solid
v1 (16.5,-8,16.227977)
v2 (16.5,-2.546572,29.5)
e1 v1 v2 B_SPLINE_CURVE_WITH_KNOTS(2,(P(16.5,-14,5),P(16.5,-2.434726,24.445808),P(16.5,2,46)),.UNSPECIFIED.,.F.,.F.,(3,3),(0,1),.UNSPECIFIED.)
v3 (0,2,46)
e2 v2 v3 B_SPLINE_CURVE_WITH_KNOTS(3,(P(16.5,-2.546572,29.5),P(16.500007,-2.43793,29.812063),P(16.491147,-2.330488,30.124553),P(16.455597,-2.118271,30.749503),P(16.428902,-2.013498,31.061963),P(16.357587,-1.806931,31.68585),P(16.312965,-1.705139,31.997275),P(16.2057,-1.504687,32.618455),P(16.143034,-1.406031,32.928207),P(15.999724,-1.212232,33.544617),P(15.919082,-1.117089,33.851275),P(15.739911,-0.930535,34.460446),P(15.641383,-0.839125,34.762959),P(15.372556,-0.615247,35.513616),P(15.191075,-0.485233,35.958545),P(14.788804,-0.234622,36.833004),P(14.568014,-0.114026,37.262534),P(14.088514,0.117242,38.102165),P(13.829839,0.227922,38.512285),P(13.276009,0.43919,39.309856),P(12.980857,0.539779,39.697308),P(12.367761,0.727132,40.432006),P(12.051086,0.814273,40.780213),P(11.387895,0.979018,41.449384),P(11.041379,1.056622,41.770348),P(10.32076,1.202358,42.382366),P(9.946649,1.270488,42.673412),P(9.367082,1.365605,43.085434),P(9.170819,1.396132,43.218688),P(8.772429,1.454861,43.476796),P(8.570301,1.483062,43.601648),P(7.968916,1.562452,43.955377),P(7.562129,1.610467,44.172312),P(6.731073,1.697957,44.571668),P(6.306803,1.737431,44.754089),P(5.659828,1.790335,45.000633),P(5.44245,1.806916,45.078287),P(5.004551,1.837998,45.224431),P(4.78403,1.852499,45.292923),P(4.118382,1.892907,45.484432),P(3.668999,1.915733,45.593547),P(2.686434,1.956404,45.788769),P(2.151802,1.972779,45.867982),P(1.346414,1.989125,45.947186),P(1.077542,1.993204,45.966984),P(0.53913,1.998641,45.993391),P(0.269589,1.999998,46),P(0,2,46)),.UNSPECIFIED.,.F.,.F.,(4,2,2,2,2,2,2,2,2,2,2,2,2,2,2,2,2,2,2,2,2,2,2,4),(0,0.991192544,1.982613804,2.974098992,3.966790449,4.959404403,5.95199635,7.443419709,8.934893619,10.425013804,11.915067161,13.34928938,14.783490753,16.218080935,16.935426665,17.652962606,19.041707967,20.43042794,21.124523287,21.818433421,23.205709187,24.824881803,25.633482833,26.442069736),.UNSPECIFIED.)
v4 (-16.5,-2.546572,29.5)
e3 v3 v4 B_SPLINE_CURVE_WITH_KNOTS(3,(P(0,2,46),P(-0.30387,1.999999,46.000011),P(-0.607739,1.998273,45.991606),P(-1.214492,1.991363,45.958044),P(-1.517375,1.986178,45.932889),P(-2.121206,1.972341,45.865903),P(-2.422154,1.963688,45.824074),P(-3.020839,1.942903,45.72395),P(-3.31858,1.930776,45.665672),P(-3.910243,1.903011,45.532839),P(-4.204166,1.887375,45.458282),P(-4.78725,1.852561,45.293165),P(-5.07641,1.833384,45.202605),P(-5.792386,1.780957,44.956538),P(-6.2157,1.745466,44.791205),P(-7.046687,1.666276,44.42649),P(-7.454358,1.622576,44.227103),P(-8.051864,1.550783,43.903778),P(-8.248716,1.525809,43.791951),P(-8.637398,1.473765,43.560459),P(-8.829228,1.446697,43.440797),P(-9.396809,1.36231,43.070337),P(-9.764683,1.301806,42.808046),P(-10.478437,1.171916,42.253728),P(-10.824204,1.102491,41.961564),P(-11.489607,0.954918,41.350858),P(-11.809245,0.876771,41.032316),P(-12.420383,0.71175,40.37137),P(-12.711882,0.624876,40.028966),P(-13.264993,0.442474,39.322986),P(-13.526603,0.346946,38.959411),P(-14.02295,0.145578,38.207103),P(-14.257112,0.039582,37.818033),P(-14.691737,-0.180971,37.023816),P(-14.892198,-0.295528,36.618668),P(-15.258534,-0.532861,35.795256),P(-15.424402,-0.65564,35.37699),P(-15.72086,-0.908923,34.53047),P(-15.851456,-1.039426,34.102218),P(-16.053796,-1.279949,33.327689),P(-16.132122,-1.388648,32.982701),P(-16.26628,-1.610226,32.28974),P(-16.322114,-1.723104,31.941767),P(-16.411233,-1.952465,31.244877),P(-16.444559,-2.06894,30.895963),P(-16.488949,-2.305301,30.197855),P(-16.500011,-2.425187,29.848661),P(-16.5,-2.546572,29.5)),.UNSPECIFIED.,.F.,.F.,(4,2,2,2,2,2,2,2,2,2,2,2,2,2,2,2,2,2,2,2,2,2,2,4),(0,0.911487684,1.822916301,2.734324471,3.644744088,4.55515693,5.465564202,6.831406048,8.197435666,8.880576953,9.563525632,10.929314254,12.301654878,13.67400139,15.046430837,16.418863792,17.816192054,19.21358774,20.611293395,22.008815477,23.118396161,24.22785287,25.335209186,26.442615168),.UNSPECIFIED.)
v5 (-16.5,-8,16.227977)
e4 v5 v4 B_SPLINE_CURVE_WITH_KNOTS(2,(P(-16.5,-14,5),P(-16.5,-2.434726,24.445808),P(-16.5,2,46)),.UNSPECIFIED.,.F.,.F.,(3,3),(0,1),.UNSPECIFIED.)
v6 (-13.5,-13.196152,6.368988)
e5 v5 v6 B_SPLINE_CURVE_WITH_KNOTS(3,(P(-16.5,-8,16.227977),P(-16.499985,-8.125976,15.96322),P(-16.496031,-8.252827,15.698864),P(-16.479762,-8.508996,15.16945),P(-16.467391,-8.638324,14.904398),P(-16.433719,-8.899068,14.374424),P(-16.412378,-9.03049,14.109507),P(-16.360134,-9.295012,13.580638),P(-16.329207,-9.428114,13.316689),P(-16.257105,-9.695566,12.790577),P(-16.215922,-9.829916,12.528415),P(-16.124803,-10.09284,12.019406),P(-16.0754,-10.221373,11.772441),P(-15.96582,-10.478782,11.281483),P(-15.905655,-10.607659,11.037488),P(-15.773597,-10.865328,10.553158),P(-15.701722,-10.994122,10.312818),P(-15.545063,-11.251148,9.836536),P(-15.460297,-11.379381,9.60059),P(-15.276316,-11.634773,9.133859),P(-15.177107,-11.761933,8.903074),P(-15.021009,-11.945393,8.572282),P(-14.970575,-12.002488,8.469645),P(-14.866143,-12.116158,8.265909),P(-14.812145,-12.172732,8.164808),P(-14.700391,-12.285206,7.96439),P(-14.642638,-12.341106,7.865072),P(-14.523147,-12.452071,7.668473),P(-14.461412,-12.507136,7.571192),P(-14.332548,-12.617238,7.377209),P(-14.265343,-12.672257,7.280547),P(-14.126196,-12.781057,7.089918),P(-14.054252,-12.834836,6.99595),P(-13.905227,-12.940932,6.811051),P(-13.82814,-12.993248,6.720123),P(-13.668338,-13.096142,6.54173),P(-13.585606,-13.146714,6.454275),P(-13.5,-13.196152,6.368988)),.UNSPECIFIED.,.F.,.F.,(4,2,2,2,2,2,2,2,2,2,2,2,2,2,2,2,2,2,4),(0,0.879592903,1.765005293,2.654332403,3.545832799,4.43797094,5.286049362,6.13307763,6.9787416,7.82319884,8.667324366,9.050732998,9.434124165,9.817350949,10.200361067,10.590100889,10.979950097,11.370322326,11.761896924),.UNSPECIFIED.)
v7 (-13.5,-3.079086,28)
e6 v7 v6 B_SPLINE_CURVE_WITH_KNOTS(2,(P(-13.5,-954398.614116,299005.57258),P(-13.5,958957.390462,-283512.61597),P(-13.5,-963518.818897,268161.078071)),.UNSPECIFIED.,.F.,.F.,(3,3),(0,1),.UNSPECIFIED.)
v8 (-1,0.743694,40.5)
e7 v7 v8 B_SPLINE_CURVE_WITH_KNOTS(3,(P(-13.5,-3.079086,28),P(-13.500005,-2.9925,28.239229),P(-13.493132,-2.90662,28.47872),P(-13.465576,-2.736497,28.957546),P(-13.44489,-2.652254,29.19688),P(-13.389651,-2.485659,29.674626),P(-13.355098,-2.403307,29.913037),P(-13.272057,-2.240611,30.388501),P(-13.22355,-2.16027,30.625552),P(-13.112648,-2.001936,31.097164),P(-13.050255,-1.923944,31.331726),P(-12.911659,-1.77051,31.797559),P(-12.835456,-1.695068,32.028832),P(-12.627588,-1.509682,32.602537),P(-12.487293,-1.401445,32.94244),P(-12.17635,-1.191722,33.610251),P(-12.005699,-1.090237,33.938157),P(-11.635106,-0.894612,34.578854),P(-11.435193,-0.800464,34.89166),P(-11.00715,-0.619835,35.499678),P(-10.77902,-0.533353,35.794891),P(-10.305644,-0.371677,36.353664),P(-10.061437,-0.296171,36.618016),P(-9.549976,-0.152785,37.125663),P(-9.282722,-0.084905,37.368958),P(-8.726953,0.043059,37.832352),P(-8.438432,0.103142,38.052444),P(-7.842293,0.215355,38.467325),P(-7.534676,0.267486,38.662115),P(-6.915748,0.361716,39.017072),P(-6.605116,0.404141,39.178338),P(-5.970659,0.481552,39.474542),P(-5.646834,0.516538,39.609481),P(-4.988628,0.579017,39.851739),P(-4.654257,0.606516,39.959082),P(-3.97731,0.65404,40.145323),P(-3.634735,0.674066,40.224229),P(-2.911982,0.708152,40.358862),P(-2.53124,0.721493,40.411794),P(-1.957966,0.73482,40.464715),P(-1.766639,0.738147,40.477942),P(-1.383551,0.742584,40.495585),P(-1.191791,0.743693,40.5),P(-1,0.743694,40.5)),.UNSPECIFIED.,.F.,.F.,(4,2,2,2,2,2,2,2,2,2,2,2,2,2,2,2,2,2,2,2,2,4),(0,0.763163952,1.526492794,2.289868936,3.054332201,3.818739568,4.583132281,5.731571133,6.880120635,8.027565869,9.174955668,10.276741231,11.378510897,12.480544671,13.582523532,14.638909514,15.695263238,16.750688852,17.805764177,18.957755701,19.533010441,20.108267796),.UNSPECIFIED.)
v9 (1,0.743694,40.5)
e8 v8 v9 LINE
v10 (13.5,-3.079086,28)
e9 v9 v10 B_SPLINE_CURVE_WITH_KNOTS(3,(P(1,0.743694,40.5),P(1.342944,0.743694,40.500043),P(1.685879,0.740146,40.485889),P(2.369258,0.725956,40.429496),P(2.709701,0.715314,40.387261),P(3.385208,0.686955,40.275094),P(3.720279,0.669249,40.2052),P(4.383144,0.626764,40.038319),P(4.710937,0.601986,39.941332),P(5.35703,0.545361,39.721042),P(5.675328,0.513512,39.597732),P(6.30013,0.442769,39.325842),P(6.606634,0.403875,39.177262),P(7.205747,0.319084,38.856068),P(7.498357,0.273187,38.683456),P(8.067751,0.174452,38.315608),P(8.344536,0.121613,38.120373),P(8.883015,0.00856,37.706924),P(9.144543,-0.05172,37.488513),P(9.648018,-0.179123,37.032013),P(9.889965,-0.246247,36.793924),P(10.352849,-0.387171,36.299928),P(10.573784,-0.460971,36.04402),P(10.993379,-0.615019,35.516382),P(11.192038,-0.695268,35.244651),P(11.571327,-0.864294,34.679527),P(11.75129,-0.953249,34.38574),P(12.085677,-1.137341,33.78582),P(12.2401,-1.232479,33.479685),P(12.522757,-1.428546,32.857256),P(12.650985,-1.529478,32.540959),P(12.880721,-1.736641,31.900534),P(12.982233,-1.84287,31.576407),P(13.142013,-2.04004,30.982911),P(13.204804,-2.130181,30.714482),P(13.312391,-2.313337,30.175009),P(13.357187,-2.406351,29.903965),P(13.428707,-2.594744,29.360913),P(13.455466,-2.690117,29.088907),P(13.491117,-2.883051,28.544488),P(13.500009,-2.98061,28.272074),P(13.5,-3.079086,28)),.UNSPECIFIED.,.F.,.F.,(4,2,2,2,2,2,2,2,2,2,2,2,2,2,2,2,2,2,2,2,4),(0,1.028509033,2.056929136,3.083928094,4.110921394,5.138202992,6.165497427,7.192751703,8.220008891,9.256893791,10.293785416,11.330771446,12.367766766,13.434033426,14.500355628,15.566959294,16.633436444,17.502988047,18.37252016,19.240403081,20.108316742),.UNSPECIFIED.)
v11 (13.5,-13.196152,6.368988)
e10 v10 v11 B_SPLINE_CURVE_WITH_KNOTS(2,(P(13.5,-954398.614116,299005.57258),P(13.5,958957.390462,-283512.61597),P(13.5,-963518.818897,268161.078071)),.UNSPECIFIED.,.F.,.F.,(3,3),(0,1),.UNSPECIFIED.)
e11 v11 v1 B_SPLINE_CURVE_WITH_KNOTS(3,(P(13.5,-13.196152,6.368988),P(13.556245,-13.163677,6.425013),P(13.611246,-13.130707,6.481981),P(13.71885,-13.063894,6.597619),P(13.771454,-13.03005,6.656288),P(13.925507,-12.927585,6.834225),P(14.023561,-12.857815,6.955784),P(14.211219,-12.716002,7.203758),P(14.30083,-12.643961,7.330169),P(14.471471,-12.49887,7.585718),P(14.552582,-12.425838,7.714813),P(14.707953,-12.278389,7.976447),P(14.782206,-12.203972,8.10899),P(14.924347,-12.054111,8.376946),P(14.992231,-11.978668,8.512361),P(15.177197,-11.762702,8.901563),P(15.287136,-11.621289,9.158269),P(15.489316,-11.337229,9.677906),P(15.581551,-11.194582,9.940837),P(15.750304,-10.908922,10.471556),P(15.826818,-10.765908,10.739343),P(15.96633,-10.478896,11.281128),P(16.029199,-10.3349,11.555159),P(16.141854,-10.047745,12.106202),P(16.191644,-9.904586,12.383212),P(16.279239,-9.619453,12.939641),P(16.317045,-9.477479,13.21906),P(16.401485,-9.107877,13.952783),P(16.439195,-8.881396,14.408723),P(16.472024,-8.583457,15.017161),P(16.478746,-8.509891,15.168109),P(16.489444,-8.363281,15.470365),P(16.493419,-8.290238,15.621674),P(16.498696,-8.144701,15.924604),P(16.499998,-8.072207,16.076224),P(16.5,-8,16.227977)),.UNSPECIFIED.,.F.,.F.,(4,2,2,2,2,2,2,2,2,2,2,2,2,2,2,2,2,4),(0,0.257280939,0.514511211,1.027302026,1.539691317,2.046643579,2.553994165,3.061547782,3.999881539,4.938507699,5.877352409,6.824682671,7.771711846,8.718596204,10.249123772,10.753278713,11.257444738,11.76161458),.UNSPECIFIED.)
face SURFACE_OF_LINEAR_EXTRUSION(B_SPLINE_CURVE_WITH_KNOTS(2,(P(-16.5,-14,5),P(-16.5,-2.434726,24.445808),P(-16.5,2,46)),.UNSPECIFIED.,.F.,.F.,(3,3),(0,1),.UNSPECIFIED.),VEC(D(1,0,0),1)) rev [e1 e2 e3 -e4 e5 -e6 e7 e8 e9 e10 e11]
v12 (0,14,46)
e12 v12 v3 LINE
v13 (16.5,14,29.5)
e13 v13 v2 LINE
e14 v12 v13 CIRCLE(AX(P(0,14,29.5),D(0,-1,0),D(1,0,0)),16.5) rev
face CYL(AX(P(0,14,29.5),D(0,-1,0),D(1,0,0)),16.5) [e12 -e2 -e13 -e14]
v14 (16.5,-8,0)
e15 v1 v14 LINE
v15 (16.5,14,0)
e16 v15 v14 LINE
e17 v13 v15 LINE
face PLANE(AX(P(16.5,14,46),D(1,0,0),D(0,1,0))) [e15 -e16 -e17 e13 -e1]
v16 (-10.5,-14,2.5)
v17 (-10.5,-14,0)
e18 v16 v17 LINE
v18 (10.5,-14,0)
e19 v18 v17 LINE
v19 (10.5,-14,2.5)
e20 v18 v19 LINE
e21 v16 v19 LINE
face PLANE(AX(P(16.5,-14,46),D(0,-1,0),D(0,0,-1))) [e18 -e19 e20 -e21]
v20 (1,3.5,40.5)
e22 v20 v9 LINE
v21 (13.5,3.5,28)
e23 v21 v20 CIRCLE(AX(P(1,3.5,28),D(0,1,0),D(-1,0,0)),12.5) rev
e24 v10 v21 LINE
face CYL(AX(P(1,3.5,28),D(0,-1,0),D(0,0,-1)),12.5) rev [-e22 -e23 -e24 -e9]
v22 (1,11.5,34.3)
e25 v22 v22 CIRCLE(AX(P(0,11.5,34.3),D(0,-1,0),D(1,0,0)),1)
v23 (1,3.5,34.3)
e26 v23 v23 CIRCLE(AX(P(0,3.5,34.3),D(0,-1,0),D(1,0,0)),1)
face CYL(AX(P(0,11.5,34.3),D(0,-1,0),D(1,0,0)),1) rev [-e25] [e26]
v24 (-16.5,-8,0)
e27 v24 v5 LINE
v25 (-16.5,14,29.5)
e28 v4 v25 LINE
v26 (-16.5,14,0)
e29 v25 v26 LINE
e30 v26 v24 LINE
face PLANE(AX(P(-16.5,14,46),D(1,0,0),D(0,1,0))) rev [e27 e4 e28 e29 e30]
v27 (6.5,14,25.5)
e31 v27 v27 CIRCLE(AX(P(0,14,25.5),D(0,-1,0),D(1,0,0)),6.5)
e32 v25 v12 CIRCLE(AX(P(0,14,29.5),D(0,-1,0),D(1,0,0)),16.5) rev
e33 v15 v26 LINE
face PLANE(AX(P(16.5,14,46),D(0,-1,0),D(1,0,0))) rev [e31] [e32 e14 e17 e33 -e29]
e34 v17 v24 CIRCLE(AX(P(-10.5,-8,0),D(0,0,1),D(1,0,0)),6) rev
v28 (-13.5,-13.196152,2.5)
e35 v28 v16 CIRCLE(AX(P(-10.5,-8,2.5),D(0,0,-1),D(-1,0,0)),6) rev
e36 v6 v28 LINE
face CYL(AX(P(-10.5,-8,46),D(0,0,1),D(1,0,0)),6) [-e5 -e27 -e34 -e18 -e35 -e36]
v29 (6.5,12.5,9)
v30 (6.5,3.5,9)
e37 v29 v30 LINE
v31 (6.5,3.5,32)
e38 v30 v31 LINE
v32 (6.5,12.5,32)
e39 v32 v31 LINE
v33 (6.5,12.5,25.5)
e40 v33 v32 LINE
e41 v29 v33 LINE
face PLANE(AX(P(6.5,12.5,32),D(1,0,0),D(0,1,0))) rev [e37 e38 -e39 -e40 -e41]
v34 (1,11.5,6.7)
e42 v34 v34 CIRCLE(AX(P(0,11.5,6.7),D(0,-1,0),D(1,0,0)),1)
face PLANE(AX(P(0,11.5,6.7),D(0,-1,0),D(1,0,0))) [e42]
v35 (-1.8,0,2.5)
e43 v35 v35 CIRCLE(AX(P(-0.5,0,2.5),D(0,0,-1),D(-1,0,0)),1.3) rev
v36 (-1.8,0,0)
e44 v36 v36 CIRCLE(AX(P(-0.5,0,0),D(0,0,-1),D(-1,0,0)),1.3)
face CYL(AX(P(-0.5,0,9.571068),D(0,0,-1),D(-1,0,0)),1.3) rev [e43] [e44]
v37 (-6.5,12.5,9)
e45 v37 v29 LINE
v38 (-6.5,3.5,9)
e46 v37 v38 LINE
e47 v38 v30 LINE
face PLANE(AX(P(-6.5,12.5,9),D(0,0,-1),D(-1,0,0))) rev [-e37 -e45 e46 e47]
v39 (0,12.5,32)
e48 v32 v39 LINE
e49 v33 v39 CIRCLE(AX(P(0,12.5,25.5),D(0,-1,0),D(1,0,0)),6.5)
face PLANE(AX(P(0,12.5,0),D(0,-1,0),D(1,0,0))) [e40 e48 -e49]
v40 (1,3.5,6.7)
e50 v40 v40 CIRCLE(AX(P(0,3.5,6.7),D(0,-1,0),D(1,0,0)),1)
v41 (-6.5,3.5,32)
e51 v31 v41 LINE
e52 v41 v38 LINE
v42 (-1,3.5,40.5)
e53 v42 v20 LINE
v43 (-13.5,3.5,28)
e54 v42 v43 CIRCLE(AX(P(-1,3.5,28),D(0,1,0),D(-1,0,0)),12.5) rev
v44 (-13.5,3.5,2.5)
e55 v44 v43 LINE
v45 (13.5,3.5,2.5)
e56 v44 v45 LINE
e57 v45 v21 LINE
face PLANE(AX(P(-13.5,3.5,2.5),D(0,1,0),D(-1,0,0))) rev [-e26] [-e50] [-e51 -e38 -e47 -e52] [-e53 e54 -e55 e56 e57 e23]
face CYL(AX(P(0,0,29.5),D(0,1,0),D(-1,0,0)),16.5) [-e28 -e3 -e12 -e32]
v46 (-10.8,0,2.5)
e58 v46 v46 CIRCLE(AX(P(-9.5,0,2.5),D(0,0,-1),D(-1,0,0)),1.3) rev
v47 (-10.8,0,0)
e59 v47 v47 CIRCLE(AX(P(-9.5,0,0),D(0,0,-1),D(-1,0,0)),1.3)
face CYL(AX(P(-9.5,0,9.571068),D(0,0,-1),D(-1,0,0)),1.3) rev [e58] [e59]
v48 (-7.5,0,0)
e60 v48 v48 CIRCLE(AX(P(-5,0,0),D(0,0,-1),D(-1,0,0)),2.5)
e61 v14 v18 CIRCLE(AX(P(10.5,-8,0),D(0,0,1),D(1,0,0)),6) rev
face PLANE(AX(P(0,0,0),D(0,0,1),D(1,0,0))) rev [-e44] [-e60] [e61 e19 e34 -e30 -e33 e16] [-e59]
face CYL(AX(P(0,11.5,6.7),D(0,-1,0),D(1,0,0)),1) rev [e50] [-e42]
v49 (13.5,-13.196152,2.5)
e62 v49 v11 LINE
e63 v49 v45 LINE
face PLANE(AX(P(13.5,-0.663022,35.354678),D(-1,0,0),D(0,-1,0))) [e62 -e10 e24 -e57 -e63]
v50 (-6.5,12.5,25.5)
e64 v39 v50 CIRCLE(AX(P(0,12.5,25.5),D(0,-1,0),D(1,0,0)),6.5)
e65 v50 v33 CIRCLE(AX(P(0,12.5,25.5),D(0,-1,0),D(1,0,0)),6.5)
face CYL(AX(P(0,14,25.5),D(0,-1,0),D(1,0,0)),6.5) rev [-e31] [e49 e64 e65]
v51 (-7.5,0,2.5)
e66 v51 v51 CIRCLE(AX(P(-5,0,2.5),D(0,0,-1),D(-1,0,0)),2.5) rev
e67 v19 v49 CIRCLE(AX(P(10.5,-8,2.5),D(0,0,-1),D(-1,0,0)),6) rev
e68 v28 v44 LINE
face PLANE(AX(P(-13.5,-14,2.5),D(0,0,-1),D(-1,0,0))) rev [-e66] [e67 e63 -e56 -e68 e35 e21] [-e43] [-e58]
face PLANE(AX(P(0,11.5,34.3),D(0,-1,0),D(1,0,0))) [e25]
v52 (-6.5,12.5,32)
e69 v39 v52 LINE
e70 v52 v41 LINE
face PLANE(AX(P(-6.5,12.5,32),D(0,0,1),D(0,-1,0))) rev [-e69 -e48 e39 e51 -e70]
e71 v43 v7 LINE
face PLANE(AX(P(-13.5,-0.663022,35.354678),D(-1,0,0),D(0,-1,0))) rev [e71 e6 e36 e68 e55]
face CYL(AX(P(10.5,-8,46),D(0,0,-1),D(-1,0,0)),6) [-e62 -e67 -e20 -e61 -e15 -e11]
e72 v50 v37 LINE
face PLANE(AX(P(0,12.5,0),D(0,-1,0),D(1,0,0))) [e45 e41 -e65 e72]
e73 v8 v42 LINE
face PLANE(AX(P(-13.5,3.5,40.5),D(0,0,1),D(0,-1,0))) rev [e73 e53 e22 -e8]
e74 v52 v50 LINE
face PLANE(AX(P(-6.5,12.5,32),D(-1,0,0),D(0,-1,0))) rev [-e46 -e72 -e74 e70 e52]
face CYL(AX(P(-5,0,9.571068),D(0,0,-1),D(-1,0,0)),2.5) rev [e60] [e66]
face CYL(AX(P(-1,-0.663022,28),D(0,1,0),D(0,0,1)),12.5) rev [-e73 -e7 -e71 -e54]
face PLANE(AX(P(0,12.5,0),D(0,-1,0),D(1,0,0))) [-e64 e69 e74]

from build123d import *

# Parameters (mm, degrees)
SKETCH1_W           = 33
SKETCH1_H           = 28
BOSS_EXTRUDE1_DEPTH = 46
CUT_EXTRUDE1_DEPTH  = 59.318093247
CUT_EXTRUDE2_START  = -3
CUT_EXTRUDE2_DEPTH  = 27
FILLET1_R           = 12.5
FILLET2_R           = 16.5
FILLET3_R           = 6
SKETCH4_W           = 13
SKETCH4_H           = 23
CUT_EXTRUDE3_DEPTH  = 9
SKETCH5_R           = 6.5
CUT_EXTRUDE4_DEPTH  = 56.592265809
SKETCH6_R           = 1
CUT_EXTRUDE5_DEPTH  = 8
SKETCH7_R           = 1.3
SKETCH7_R_2         = 2.5
CUT_EXTRUDE6_DEPTH  = 2.5


with BuildPart() as part:
    # Sketch1 → Boss-Extrude1 (new body)
    with BuildSketch(Plane.XY):
        Rectangle(SKETCH1_W, SKETCH1_H)
    extrude(amount=BOSS_EXTRUDE1_DEPTH)

    # Sketch2 → Cut-Extrude1 (cut, through all)
    with BuildSketch(Plane(origin=(16.5, 0, 0), x_dir=(0, 0, -1), z_dir=(1, 0, 0))):
        with BuildLine():
            Line((-46, 2), (-46, -14))
            Line((-46, -14), (-5, -14))
            add(Edge.make_bspline(
                [(-5, -14), (-24.445807758, -2.434726237), (-46, 2)],
                knots=[0, 0, 0, 1, 1, 1], degree=2))
        make_face()
    extrude(amount=-CUT_EXTRUDE1_DEPTH, mode=Mode.SUBTRACT)

    # Sketch3 → Cut-Extrude2 (cut)
    with BuildSketch(Plane(origin=(16.5, 0, 0), x_dir=(0, 0, -1), z_dir=(1, 0, 0)).offset(CUT_EXTRUDE2_START)):
        with BuildLine():
            Line((-5, -14), (-2.5, -14))
            Line((-2.5, -14), (-2.5, 3.5))
            Line((-2.5, 3.5), (-40.5, 3.5))
            Line((-40.5, 3.5), (-40.5, 0.743693735))
            add(Edge.make_bspline(
                [(-5, -14), (-21.949128929, -3.919610512), (-40.5, 0.743693735)],
                knots=[0, 0, 0, 1, 1, 1], degree=2))
        make_face()
    extrude(amount=-CUT_EXTRUDE2_DEPTH, mode=Mode.SUBTRACT)

    # Fillet1
    fillet1_edges = [part.edges().sort_by_distance(p)[0] for p in [
        (13.5, 2.121846868, 40.5),
        (-13.5, 2.121846868, 40.5),
    ]]
    fillet(fillet1_edges, radius=FILLET1_R)

    # Fillet2
    fillet2_edges = [part.edges().sort_by_distance(p)[0] for p in [
        (16.5, 8, 46),
        (-16.5, 8, 46),
    ]]
    fillet(fillet2_edges, radius=FILLET2_R - 0.0001)  # a hair under: the kernel refuses the full size

    # Fillet3
    fillet3_edges = [part.edges().sort_by_distance(p)[0] for p in [
        (-16.5, -14, 2.5),
        (16.5, -14, 2.5),
    ]]
    fillet(fillet3_edges, radius=FILLET3_R)

    # Sketch4 → Cut-Extrude3 (cut)
    with BuildSketch(Plane.XZ.offset(-3.5)):
        with Locations((0, 20.5)):
            Rectangle(SKETCH4_W, SKETCH4_H)
    extrude(amount=-CUT_EXTRUDE3_DEPTH, mode=Mode.SUBTRACT)

    # Sketch5 → Cut-Extrude4 (cut, through all)
    with BuildSketch(Plane.XZ.offset(-12.5)):
        with Locations((0, 25.5)):
            Circle(SKETCH5_R)
    extrude(amount=-CUT_EXTRUDE4_DEPTH, mode=Mode.SUBTRACT)

    # Sketch6 → Cut-Extrude5 (cut)
    with BuildSketch(Plane.XZ.offset(-3.5)):
        with Locations((0, 34.3)):
            Circle(SKETCH6_R)
        with Locations((0, 6.7)):
            Circle(SKETCH6_R)
    extrude(amount=-CUT_EXTRUDE5_DEPTH, mode=Mode.SUBTRACT)

    # Sketch7 → Cut-Extrude6 (cut)
    with BuildSketch(Plane(origin=(0, 0, 0), x_dir=(-1, 0, 0), z_dir=(0, 0, -1))):
        with Locations((0.5, 0)):
            Circle(SKETCH7_R)
        with Locations((5, 0)):
            Circle(SKETCH7_R_2)
        with Locations((9.5, 0)):
            Circle(SKETCH7_R)
    extrude(amount=-CUT_EXTRUDE6_DEPTH, mode=Mode.SUBTRACT)


solid = part.part
